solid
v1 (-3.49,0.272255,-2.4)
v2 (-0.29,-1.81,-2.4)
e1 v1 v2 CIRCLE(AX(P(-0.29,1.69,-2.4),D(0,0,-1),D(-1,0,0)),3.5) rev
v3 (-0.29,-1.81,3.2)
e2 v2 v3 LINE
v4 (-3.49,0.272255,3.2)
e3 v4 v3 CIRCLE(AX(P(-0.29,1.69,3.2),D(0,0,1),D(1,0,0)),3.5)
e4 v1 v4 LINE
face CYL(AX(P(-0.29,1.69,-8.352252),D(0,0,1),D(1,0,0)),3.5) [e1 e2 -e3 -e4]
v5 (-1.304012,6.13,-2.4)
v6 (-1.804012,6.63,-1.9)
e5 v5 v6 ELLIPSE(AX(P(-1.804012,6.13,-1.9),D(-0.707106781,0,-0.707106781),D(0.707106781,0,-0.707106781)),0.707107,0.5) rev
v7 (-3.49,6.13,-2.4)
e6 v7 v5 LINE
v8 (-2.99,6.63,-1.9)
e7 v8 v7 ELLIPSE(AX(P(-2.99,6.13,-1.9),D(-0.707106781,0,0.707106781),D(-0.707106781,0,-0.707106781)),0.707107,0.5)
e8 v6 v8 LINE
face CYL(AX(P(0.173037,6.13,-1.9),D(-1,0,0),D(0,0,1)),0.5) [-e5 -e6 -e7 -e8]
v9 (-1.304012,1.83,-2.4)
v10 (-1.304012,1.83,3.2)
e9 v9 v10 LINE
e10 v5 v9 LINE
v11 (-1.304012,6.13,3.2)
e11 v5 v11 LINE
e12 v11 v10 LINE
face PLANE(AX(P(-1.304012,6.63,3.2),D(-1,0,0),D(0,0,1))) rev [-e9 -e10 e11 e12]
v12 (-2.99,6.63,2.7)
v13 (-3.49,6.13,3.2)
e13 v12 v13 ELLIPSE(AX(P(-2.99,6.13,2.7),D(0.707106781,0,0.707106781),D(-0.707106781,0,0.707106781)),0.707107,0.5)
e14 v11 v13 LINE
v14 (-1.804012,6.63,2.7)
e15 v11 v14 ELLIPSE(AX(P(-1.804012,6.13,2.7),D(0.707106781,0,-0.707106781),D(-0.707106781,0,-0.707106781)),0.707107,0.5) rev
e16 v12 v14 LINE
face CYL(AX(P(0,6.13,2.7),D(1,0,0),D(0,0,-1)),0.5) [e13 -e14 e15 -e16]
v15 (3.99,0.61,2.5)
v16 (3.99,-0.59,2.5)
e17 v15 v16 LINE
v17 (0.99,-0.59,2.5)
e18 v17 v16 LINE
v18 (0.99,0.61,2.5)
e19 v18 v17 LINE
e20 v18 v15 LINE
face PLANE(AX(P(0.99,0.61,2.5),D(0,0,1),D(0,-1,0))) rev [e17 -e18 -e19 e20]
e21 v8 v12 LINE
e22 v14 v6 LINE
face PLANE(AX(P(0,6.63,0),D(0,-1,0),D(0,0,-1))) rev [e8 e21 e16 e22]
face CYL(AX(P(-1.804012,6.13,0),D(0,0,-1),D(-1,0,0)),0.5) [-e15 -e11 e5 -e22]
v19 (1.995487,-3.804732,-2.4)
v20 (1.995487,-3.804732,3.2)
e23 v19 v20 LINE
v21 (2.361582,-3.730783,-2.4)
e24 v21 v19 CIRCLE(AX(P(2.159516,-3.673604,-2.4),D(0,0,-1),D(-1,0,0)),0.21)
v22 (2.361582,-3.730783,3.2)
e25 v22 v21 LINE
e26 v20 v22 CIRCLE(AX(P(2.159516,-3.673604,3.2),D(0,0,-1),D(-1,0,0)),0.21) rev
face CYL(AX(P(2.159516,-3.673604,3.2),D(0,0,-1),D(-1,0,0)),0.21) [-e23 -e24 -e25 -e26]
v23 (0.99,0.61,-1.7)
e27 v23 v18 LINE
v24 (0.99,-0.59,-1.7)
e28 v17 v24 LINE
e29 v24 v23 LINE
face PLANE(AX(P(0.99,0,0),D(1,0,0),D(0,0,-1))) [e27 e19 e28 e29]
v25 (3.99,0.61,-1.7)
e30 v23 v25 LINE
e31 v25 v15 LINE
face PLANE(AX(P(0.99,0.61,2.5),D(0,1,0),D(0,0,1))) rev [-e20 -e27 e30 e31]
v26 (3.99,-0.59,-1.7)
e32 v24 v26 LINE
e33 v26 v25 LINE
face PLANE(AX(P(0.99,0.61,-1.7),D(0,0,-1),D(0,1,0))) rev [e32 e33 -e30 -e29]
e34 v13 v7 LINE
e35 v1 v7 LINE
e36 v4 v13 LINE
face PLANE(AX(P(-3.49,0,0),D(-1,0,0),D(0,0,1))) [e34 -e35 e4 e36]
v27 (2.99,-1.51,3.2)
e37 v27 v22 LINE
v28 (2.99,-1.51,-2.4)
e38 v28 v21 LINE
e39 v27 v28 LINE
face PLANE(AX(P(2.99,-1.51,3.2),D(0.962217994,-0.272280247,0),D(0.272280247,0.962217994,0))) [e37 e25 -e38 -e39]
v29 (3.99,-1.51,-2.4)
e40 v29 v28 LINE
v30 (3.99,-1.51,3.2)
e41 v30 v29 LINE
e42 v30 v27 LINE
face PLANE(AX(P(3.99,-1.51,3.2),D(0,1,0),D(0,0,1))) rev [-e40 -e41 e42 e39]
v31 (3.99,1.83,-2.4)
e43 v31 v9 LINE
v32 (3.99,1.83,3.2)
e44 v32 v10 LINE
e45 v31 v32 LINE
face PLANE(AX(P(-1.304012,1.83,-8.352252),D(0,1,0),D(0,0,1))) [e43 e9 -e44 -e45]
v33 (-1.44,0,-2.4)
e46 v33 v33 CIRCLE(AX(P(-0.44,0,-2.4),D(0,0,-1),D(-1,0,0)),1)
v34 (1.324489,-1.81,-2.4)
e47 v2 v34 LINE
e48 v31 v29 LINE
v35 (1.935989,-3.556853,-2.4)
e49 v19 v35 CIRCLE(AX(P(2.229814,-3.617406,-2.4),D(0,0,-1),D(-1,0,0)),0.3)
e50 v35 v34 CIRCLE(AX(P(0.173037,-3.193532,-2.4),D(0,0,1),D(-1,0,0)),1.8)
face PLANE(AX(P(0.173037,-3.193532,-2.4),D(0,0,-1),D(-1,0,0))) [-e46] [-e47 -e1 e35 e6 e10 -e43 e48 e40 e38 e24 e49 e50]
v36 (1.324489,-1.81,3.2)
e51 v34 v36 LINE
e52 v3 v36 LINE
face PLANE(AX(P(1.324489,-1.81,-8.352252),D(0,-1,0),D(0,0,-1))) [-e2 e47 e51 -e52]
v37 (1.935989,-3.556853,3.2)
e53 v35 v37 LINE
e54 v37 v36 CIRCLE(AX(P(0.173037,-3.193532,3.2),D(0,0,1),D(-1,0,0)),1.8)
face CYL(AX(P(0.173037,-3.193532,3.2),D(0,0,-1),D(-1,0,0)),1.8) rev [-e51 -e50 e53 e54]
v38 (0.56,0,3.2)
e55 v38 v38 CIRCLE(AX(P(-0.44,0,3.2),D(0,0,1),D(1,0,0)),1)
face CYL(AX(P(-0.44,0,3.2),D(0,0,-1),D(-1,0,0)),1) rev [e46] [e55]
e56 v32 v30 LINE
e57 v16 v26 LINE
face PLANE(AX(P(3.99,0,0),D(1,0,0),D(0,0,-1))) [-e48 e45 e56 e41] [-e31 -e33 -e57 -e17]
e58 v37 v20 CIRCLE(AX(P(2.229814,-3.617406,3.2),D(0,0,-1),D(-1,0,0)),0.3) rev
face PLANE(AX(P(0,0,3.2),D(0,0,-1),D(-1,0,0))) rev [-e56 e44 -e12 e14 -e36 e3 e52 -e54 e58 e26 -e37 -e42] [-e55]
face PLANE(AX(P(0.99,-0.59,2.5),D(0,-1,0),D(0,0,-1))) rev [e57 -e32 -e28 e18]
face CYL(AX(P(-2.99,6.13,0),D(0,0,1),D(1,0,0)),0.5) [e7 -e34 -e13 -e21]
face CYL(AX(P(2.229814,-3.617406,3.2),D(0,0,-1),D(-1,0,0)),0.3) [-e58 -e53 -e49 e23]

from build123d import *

# Parameters (mm, degrees)
CROQUIS1_W               = 5.98
CROQUIS1_H               = 2.26
CROQUIS1_R               = 1
SALIENTE_EXTRUIR1_DEPTH  = 3.2
CROQUIS2_W               = 2.18
CROQUIS2_H               = 0.38
SALIENTE_EXTRUIR2_DEPTH  = 3.2
CROQUIS4_W               = 1.68598805
CROQUIS4_H               = 3.2
SALIENTE_EXTRUIR3_DEPTH  = 5.5
SALIENTE_EXTRUIR4_DEPTH  = 3.2
REDONDEO2_R              = 0.3
REDONDEO3_R              = 0.21
CROQUIS6_W               = 3.2
CROQUIS6_H               = 7.76
SALIENTE_EXTRUIR5_DEPTH  = 0.5
CROQUIS7_W               = 2.18598805
CROQUIS7_H               = 7.76
SALIENTE_EXTRUIR6_DEPTH  = 1.6
SALIENTE_EXTRUIR7_START  = 1.6
SALIENTE_EXTRUIR7_DEPTH  = 1.6
CORTAR_EXTRUIR2_START    = -10
CORTAR_EXTRUIR2_DEPTH    = 10
CROQUIS11_W              = 4.8
CROQUIS11_H              = 2.64
SALIENTE_EXTRUIR8_DEPTH  = 1
CROQUIS15_W              = 4.3
CROQUIS15_H              = 4.8
SALIENTE_EXTRUIR10_DEPTH = 0.38
REDONDEO6_R              = 3.2
CROQUIS16_W              = 5.29401195
CROQUIS16_H              = 4.8
SALIENTE_EXTRUIR11_DEPTH = 0.4
SALIENTE_EXTRUIR12_START = 0.8
CROQUIS18_R              = 1
SALIENTE_EXTRUIR12_DEPTH = 0.8
REDONDEO7_R              = 0.5
CROQUIS19_W              = 4.2
CROQUIS19_H              = 1.2
CORTAR_EXTRUIR3_DEPTH    = 3
SALIENTE_EXTRUIR13_START = -5.6
CROQUIS20_W              = 5.29401195
CROQUIS20_H              = 0.3
SALIENTE_EXTRUIR13_DEPTH = 5.6


with BuildPart() as part:
    # Croquis1 → Saliente-Extruir1 (new body)
    with BuildSketch(Plane.XY):
        Rectangle(CROQUIS1_W, CROQUIS1_H)
        with Locations((-0.44, 0)):
            Circle(CROQUIS1_R, mode=Mode.SUBTRACT)
    extrude(amount=SALIENTE_EXTRUIR1_DEPTH)

    # Croquis2 → Saliente-Extruir2 (add)
    with BuildSketch(Plane.XY):
        with Locations((1.9, -1.32)):
            Rectangle(CROQUIS2_W, CROQUIS2_H)
    extrude(amount=SALIENTE_EXTRUIR2_DEPTH)

    # Croquis4 → Saliente-Extruir3 (add)
    with BuildSketch(Plane(origin=(0, 1.13, 0), x_dir=(1, 0, 0), z_dir=(0, 1, 0))):
        with Locations((-2.147005975, -1.6)):
            Rectangle(CROQUIS4_W, CROQUIS4_H)
    extrude(amount=SALIENTE_EXTRUIR3_DEPTH)

    # Croquis5 → Saliente-Extruir4 (add)
    with BuildSketch(Plane(origin=(0, 0, 0), x_dir=(-1, 0, 0), z_dir=(0, 0, -1))):
        with BuildLine():
            Line((-2.99, -1.51), (-2.312022185, -3.905922804))
            ThreePointArc((-2.312022185, -3.905922804), (-2.072768276, -3.925139809), (-1.86757295, -3.80061429))
            ThreePointArc((-1.86757295, -3.80061429), (-1.807264861, -2.439011425), (-0.81, -1.51))
            Line((-0.81, -1.51), (-2.99, -1.51))
        make_face()
    extrude(amount=-SALIENTE_EXTRUIR4_DEPTH)

    # Redondeo2
    # the kernel refuses this fillet: 0.3 mm, written as the material it takes off along each edge
    with BuildSketch(Plane(origin=(1.86757295, -3.80061429, -1.141887159), x_dir=(0.2702256968555762, 0.9627970049594662, 0), z_dir=(0, 0, 1))) as redondeo2_piece_1:
        with BuildLine():
            CenterArc((0.274279078, -0.299257177), REDONDEO2_R, 94.032824869, 117.548904109)
            Line((0.018710883, -0.456371459), (0.013599519, -0.459513744))
            ThreePointArc((0.013599519, -0.459513744), (-0.07043871, -0.231457229), (-0.005003521, 0.00331131))
            Line((-0.005003521, 0.00331131), (0.000421968, 0.005985144))
            ThreePointArc((0.000421968, 0.005985144), (0.126590344, 0.001543061), (0.25275872, 0.005985144))
            Line((0.25275872, 0.005985144), (0.253180688, 0))
        make_face()
    extrude(amount=5.483774318, mode=Mode.SUBTRACT)

    # Redondeo3
    redondeo3_edges = [part.edges().sort_by_distance(p)[0] for p in [
        (2.312022185, -3.905922804, 1.6),
    ]]
    fillet(redondeo3_edges, radius=REDONDEO3_R)

    # Croquis6 → Saliente-Extruir5 (add)
    with BuildSketch(Plane.ZY.offset(2.99)):
        with Locations((1.6, 2.75)):
            Rectangle(CROQUIS6_W, CROQUIS6_H)
    extrude(amount=SALIENTE_EXTRUIR5_DEPTH)

    # Croquis7 → Saliente-Extruir6 (add)
    with BuildSketch(Plane(origin=(0, 0, 0), x_dir=(-1, 0, 0), z_dir=(0, 0, -1))):
        with Locations((2.397005975, 2.75)):
            Rectangle(CROQUIS7_W, CROQUIS7_H)
    extrude(amount=SALIENTE_EXTRUIR6_DEPTH)

    # Croquis8 → Saliente-Extruir7 (add)
    with BuildSketch(Plane(origin=(0, 0, 0), x_dir=(-1, 0, 0), z_dir=(0, 0, -1)).offset(SALIENTE_EXTRUIR7_START)):
        with BuildLine():
            Line((-0.81, -1.13), (1.30401195, -1.13))
            Line((1.30401195, -1.13), (1.30401195, -0.503471301))
            ThreePointArc((1.30401195, -0.503471301), (-0.56, 0), (1.30401195, 0.503471301))
            Line((1.30401195, 0.503471301), (1.30401195, 1.13))
            Line((1.30401195, 1.13), (-2.99, 1.13))
            Line((-2.99, 1.13), (-2.99, -1.51))
            Line((-2.99, -1.51), (-2.361581826, -3.730782744))
            ThreePointArc((-2.361581826, -3.730782744), (-2.201095129, -3.879446502), (-1.995487215, -3.804731853))
            ThreePointArc((-1.995487215, -3.804731853), (-1.938099887, -3.687426244), (-1.935988878, -3.556852683))
            ThreePointArc((-1.935988878, -3.556852683), (-1.750154515, -2.325947779), (-0.81, -1.51))
            Line((-0.81, -1.51), (-0.81, -1.13))
        make_face()
    extrude(amount=-SALIENTE_EXTRUIR7_DEPTH)

    # Croquis9 → Cortar-Extruir2 (cut)
    with BuildSketch(Plane.XY.offset(CORTAR_EXTRUIR2_START)):
        with BuildLine():
            Line((-1.30401195, -0.503471301), (-1.30401195, 0.503471301))
            ThreePointArc((-1.30401195, 0.503471301), (-1.44, 0), (-1.30401195, -0.503471301))
        make_face()
    extrude(amount=CORTAR_EXTRUIR2_DEPTH, mode=Mode.SUBTRACT)

    # Croquis11 → Saliente-Extruir8 (add)
    with BuildSketch(Plane(origin=(2.99, 0, 0), x_dir=(0, 0, -1), z_dir=(1, 0, 0))):
        with Locations((-0.8, -0.19)):
            Rectangle(CROQUIS11_W, CROQUIS11_H)
    extrude(amount=SALIENTE_EXTRUIR8_DEPTH)

    # Croquis15 → Saliente-Extruir10 (add)
    with BuildSketch(Plane.XZ.offset(1.13)):
        with Locations((-1.34, 0.8)):
            Rectangle(CROQUIS15_W, CROQUIS15_H)
    extrude(amount=SALIENTE_EXTRUIR10_DEPTH)

    # Redondeo6
    redondeo6_edges = [part.edges().sort_by_distance(p)[0] for p in [
        (-3.49, -1.51, 0.8),
    ]]
    fillet(redondeo6_edges, radius=REDONDEO6_R)

    # Croquis16 → Saliente-Extruir11 (add)
    with BuildSketch(Plane(origin=(0, 1.13, 0), x_dir=(1, 0, 0), z_dir=(0, 1, 0))):
        with Locations((1.342994025, -0.8)):
            Rectangle(CROQUIS16_W, CROQUIS16_H)
    extrude(amount=SALIENTE_EXTRUIR11_DEPTH)

    # Croquis18 → Saliente-Extruir12 (add)
    with BuildSketch(Plane(origin=(0, 0, -1.6), x_dir=(-1, 0, 0), z_dir=(0, 0, -1)).offset(SALIENTE_EXTRUIR12_START)):
        with BuildLine():
            Line((-0.81, -1.51), (0.29, -1.51))
            ThreePointArc((0.29, -1.51), (2.5527417, -0.5727417), (3.49, 1.69))
            Line((3.49, 1.69), (3.49, 6.63))
            Line((3.49, 6.63), (1.30401195, 6.63))
            Line((1.30401195, 6.63), (1.30401195, 1.53))
            Line((1.30401195, 1.53), (-3.99, 1.53))
            Line((-3.99, 1.53), (-3.99, -1.51))
            Line((-3.99, -1.51), (-2.99, -1.51))
            Line((-2.99, -1.51), (-2.361581826, -3.730782744))
            ThreePointArc((-2.361581826, -3.730782744), (-2.201095129, -3.879446502), (-1.995487215, -3.804731853))
            ThreePointArc((-1.995487215, -3.804731853), (-1.938099887, -3.687426244), (-1.935988878, -3.556852683))
            ThreePointArc((-1.935988878, -3.556852683), (-1.750154515, -2.325947779), (-0.81, -1.51))
        make_face()
        with Locations((0.44, 0)):
            Circle(CROQUIS18_R, mode=Mode.SUBTRACT)
    extrude(amount=-SALIENTE_EXTRUIR12_DEPTH)

    # Redondeo7
    redondeo7_edges = [part.edges().sort_by_distance(p)[0] for p in [
        (-2.397005975, 6.63, -2.4),
        (-2.397005975, 6.63, 3.2),
        (-1.30401195, 6.63, 0.4),
        (-3.49, 6.63, 0.4),
    ]]
    fillet(redondeo7_edges, radius=REDONDEO7_R)

    # Croquis19 → Cortar-Extruir3 (cut)
    with BuildSketch(Plane(origin=(3.99, 0, 0), x_dir=(0, 0, -1), z_dir=(1, 0, 0))):
        with Locations((-0.4, 0.01)):
            Rectangle(CROQUIS19_W, CROQUIS19_H)
    extrude(amount=-CORTAR_EXTRUIR3_DEPTH, mode=Mode.SUBTRACT)

    # Croquis20 → Saliente-Extruir13 (add)
    with BuildSketch(Plane.XY.offset(3.2).offset(SALIENTE_EXTRUIR13_START)):
        with Locations((1.342994025, 1.68)):
            Rectangle(CROQUIS20_W, CROQUIS20_H)
        with BuildLine():
            Line((-3.49, 1.69), (-3.49, 0.272255312))
            ThreePointArc((-3.49, 0.272255312), (-2.198912464, -1.243607541), (-0.29, -1.81))
            Line((-0.29, -1.81), (1.324488812, -1.81))
            ThreePointArc((1.324488812, -1.81), (1.079738106, -1.63857377), (0.81, -1.51))
            Line((0.81, -1.51), (-0.29, -1.51))
            ThreePointArc((-0.29, -1.51), (-2.5527417, -0.5727417), (-3.49, 1.69))
        make_face()
    extrude(amount=SALIENTE_EXTRUIR13_DEPTH)


solid = part.part
